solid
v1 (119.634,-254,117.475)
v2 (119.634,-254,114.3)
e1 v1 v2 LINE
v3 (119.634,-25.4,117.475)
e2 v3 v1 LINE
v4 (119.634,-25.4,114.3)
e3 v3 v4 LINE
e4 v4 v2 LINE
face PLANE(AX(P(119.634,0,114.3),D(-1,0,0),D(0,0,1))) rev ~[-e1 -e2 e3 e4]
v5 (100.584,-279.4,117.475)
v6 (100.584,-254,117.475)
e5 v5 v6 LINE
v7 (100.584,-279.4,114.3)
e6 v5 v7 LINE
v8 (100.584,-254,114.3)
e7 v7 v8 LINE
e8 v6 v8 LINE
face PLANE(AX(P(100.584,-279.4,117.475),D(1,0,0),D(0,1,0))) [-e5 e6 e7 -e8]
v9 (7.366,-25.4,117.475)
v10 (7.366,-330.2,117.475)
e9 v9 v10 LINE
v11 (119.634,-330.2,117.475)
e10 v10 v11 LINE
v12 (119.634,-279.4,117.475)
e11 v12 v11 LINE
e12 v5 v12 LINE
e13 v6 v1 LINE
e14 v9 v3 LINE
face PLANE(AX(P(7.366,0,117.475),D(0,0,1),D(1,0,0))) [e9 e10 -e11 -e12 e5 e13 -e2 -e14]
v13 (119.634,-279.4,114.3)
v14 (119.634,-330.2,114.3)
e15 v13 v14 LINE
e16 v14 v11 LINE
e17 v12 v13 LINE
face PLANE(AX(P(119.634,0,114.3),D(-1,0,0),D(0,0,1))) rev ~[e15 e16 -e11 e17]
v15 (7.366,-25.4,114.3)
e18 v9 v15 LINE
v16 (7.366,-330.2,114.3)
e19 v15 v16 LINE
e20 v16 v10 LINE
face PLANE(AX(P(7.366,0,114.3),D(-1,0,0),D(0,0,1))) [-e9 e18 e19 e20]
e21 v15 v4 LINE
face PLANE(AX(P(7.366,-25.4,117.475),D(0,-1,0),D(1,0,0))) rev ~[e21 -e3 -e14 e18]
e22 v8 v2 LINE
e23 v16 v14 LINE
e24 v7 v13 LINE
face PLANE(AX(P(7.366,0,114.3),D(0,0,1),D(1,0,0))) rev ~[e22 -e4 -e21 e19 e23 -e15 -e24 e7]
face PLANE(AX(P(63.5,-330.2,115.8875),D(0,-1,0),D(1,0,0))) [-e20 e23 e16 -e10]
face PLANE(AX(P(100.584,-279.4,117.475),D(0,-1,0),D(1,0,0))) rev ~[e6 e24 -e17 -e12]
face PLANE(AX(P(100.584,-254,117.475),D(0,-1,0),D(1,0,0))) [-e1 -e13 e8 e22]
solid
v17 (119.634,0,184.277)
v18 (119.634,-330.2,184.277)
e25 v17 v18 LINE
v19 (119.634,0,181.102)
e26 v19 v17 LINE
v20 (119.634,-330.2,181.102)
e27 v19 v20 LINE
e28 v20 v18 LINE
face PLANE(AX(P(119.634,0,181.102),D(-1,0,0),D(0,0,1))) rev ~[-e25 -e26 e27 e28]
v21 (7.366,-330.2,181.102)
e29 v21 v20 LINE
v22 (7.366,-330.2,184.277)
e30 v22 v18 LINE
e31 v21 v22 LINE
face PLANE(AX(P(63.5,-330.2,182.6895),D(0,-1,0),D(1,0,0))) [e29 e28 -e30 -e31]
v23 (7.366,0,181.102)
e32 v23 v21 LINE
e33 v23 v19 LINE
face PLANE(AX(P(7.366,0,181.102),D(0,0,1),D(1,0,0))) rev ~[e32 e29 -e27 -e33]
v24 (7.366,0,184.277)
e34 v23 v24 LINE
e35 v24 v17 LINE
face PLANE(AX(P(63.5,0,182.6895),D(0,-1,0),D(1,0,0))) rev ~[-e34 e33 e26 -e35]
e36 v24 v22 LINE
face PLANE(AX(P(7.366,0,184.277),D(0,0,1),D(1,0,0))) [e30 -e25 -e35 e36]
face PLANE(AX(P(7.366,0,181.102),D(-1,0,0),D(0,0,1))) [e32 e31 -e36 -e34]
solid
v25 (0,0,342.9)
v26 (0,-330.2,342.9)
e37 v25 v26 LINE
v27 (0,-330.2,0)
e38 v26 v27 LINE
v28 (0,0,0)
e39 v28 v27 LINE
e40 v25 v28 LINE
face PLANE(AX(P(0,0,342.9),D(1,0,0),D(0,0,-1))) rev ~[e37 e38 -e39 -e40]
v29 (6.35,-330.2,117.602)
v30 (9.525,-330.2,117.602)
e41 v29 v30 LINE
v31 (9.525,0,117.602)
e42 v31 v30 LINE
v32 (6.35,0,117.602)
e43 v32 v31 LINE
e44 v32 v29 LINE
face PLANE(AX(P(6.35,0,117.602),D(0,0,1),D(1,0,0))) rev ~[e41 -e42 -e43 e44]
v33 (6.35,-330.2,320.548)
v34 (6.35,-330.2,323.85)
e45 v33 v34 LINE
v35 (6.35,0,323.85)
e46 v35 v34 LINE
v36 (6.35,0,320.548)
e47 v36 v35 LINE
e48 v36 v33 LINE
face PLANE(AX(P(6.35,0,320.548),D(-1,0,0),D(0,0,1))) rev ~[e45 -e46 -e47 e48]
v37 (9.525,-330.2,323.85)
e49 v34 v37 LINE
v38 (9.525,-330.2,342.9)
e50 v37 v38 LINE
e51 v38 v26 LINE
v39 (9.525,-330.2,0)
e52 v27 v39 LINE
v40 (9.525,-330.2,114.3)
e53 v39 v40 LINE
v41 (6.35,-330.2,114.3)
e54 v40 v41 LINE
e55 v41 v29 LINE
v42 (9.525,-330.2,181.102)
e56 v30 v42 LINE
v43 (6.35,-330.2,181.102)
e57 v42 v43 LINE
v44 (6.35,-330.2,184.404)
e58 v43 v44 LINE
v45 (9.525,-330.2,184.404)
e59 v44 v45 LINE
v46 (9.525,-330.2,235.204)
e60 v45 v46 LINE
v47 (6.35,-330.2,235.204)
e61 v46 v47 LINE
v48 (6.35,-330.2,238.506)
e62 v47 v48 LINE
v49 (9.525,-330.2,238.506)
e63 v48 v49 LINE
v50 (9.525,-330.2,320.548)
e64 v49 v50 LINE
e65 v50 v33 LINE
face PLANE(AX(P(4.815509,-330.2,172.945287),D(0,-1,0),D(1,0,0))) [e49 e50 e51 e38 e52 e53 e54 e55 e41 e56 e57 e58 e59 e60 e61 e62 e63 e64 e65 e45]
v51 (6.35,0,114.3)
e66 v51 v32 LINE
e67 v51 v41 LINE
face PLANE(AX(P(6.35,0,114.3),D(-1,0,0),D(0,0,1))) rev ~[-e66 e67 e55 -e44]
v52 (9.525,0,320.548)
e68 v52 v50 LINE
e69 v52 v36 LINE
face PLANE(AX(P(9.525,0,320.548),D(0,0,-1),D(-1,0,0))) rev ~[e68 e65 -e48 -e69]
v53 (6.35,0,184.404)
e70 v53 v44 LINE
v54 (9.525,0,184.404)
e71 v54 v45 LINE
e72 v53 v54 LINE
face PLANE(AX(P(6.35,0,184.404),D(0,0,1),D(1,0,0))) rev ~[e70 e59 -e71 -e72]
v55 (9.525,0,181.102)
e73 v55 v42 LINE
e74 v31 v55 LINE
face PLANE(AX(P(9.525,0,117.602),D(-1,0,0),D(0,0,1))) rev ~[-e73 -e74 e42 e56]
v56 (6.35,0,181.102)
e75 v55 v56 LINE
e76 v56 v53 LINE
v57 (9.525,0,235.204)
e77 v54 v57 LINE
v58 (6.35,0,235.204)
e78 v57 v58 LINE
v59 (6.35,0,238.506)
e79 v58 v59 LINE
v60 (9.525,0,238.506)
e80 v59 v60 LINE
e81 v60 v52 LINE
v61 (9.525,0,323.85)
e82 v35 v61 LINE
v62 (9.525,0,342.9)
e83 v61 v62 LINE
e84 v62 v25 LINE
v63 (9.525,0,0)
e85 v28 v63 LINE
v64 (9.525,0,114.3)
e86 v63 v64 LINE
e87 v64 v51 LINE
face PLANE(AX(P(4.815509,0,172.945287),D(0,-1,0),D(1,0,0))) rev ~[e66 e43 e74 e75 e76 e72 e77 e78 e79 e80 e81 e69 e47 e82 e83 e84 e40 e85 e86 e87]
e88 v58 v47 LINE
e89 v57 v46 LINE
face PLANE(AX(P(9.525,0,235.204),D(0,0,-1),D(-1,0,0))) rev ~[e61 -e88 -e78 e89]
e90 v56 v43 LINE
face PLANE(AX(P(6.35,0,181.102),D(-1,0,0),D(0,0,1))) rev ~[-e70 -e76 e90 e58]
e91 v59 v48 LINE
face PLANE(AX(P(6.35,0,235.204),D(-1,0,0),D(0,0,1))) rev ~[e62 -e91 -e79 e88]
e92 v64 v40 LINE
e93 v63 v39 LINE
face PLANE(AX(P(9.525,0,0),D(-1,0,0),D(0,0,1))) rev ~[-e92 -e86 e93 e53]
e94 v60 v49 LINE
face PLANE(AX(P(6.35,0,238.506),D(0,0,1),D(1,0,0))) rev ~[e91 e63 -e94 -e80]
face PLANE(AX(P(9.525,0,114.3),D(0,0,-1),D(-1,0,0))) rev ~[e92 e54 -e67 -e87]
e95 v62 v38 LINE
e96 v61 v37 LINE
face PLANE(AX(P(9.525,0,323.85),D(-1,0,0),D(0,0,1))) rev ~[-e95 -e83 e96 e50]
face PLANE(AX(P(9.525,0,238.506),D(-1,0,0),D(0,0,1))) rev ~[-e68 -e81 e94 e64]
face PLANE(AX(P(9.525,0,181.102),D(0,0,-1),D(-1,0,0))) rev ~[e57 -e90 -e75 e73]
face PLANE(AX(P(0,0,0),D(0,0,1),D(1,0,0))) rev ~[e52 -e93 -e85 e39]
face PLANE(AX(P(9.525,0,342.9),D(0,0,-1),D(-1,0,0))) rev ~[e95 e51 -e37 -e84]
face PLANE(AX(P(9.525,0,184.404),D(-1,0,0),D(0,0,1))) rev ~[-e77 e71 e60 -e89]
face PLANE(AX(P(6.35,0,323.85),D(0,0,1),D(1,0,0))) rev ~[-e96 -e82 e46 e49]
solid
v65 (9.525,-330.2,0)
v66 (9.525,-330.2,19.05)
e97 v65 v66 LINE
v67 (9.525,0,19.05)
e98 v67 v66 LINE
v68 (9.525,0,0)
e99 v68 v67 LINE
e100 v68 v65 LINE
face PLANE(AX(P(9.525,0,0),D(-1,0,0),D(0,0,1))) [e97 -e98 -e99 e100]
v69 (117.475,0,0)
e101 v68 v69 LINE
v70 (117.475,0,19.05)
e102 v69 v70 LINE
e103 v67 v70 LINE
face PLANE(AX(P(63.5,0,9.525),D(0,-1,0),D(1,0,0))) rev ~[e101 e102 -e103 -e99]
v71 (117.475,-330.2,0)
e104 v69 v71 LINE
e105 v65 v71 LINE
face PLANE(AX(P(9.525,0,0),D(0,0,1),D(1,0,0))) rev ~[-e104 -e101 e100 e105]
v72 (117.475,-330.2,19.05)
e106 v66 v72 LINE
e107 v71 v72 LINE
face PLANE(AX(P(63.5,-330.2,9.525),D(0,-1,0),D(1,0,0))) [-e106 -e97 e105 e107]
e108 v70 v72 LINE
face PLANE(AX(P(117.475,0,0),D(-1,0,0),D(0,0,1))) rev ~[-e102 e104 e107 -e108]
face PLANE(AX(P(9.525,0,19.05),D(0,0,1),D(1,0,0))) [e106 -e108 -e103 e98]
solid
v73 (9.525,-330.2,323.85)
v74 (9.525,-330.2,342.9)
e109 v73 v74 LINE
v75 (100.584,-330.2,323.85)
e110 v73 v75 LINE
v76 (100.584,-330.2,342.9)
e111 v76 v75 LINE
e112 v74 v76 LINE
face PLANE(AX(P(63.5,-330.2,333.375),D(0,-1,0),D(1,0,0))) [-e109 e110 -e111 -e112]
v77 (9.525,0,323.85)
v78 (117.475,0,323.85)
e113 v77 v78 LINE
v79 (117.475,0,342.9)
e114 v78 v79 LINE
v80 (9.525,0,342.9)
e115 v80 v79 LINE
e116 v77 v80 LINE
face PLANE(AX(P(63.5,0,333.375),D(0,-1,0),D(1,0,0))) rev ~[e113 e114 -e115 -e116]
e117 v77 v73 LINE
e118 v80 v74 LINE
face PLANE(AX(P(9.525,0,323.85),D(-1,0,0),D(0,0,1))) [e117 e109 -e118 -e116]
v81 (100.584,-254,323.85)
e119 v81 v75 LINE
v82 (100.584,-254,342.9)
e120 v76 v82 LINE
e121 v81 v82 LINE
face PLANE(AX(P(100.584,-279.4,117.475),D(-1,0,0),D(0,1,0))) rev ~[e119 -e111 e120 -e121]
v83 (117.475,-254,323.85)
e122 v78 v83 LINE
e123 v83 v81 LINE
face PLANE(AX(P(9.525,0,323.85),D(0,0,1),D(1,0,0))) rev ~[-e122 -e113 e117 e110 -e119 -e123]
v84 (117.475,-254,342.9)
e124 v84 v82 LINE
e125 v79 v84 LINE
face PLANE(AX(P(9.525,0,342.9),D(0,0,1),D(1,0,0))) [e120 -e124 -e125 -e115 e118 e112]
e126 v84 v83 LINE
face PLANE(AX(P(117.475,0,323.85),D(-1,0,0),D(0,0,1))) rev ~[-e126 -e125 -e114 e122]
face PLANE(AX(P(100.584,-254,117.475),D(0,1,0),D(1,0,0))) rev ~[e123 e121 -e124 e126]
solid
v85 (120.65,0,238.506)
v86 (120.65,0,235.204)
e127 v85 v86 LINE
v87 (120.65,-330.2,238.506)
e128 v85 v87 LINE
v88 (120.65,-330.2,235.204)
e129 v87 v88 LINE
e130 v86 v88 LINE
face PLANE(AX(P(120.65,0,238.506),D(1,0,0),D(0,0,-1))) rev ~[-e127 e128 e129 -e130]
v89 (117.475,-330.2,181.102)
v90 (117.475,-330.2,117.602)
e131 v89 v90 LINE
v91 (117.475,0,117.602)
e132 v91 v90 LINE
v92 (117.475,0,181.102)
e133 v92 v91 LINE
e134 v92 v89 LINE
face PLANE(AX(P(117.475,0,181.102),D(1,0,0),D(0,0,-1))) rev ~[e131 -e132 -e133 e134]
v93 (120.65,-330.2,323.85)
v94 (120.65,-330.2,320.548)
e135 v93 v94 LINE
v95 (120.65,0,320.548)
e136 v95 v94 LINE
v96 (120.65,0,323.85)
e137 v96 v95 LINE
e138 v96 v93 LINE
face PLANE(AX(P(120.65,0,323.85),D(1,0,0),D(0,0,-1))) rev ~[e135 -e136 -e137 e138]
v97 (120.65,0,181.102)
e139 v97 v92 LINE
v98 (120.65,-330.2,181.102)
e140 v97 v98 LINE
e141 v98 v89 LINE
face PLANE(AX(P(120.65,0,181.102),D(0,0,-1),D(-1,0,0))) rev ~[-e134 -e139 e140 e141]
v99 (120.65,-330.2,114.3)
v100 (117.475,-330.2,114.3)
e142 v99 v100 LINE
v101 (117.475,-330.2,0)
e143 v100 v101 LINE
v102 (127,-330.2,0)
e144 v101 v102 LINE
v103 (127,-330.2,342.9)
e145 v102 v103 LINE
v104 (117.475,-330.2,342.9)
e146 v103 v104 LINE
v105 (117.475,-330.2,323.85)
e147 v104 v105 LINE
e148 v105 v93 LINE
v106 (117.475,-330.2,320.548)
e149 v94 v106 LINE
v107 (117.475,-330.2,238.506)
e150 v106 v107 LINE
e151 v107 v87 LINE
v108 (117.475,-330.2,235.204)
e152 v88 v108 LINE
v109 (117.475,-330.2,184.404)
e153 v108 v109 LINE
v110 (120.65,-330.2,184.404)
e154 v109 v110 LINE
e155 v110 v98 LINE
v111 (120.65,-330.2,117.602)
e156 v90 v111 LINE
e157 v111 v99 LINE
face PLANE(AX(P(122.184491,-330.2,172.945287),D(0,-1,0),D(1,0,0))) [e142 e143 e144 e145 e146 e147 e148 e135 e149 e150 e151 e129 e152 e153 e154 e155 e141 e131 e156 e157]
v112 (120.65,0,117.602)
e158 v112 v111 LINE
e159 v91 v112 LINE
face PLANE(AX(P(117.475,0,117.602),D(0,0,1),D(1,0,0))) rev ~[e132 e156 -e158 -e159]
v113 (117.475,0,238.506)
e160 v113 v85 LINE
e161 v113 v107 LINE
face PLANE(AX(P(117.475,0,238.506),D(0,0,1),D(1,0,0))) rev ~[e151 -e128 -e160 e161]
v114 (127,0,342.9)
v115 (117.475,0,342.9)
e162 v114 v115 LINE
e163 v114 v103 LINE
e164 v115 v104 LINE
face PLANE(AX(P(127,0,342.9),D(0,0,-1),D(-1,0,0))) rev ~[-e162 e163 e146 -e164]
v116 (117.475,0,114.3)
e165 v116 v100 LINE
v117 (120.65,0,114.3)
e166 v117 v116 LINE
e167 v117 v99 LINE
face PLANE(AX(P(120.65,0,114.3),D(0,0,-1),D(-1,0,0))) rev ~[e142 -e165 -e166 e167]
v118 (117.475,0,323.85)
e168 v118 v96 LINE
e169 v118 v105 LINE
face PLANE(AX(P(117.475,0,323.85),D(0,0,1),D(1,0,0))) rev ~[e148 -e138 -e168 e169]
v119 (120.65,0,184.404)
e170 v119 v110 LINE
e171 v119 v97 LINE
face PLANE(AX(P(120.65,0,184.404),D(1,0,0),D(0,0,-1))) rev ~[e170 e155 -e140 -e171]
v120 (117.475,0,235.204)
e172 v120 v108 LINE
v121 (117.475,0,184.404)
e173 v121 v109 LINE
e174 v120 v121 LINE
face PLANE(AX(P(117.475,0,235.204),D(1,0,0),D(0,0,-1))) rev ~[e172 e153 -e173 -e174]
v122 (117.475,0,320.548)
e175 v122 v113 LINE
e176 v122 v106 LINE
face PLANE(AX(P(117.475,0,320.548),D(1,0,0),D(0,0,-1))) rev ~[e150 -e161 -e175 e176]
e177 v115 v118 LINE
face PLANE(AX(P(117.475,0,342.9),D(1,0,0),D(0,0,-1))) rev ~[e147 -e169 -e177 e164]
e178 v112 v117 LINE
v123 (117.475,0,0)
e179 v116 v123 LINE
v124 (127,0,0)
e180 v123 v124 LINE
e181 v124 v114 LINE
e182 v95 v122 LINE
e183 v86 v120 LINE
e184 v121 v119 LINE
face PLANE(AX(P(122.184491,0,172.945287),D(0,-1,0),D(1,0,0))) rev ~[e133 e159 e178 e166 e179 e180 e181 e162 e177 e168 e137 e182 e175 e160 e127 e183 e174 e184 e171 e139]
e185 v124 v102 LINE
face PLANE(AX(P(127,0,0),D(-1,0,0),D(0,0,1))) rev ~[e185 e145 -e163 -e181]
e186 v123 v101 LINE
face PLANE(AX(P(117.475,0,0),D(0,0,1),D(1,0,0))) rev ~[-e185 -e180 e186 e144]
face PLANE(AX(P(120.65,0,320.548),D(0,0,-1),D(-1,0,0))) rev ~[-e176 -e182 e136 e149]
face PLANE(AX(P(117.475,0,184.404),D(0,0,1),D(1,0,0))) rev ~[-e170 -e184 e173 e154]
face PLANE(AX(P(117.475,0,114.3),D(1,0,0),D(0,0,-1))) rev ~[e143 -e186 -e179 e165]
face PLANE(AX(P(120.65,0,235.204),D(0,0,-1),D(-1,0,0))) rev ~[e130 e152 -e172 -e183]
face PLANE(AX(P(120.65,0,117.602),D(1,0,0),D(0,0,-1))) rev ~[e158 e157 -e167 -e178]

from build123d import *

# Parameters (mm, degrees)
F1_DEPTH  = 330.2
F0_W      = 107.95
F0_H      = 19.05
F2_DEPTH  = 330.2
F3_W      = 112.268
F3_H      = 3.175
F4_DEPTH  = 330.2
F5_W      = 19.05
F5_H      = 25.4
F6_DEPTH  = 3.175
F7_DEPTH  = 225.426
F8_W      = 16.891
F8_H      = 50.8000000001
F9_DEPTH  = 342.901
F10_W     = 112.268
F10_H     = 25.4
F11_DEPTH = 117.476


with BuildPart() as f1:
    # F0 (on Front) → F1 (new body)
    with BuildSketch(Plane.XZ):
        Polygon((0, 342.9), (0, 0), (9.525, 0), (9.525, 19.05), (9.525, 114.3), (6.35, 114.3), (6.35, 117.602), (9.525, 117.602), (9.525, 181.102), (6.35, 181.102), (6.35, 184.404), (9.525, 184.404), (9.525, 235.204), (6.35, 235.204), (6.35, 238.506), (9.525, 238.506), (9.525, 320.548), (6.35, 320.548), (6.35, 323.85), (9.525, 323.85), (9.525, 342.9), align=None)
    extrude(amount=F1_DEPTH)


with BuildPart() as f1b:
    # F0 (on Front) → F1, piece 2 (new body)
    with BuildSketch(Plane.XZ):
        Polygon((117.475, 19.05), (117.475, 0), (127, 0), (127, 342.9), (117.475, 342.9), (117.475, 323.85), (120.65, 323.85), (120.65, 320.548), (117.475, 320.548), (117.475, 238.506), (120.65, 238.506), (120.65, 235.204), (117.475, 235.204), (117.475, 184.404), (120.65, 184.404), (120.65, 181.102), (117.475, 181.102), (117.475, 117.602), (120.65, 117.602), (120.65, 114.3), (117.475, 114.3), align=None)
    extrude(amount=F1_DEPTH)


with BuildPart() as f2:
    # F0 (on Front) → F2 (new body, through all)
    with BuildSketch(Plane.XZ):
        with Locations((63.5, 9.525)):
            Rectangle(F0_W, F0_H)
    extrude(amount=F2_DEPTH)


with BuildPart() as f2b:
    # F0 (on Front) → F2, piece 2 (new body, through all)
    with BuildSketch(Plane.XZ):
        with Locations((63.5, 333.375)):
            Rectangle(F0_W, F0_H)
    extrude(amount=F2_DEPTH)

    # F5 (on face) → F7 (cut, through all)
    with BuildSketch(Plane.XY.offset(117.475)):
        with Locations((110.109, -266.7)):
            Rectangle(F5_W, F5_H)
    extrude(amount=F7_DEPTH, mode=Mode.SUBTRACT)

    # F8 (on face) → F9 (cut, through all)
    with BuildSketch(Plane.XY.offset(342.9)):
        with Locations((109.0295, -304.8000000001)):
            Rectangle(F8_W, F8_H)
    extrude(amount=-F9_DEPTH, mode=Mode.SUBTRACT)


with BuildPart() as f4:
    # F3 (on Front) → F4 (new body, through all)
    with BuildSketch(Plane.XZ):
        with Locations((63.5, 115.8875)):
            Rectangle(F3_W, F3_H)
    extrude(amount=F4_DEPTH)

    # F5 (on face) → F6 (cut, through all)
    with BuildSketch(Plane.XY.offset(117.475)):
        with Locations((110.109, -266.7)):
            Rectangle(F5_W, F5_H)
    extrude(amount=-F6_DEPTH, mode=Mode.SUBTRACT)

    # F10 (on face) → F11 (cut, through all)
    with BuildSketch(Plane.XY.offset(117.475)):
        with Locations((63.5, -12.7)):
            Rectangle(F10_W, F10_H)
    extrude(amount=-F11_DEPTH, mode=Mode.SUBTRACT)


with BuildPart() as f4b:
    # F3 (on Front) → F4, piece 2 (new body, through all)
    with BuildSketch(Plane.XZ):
        with Locations((63.5, 182.6895)):
            Rectangle(F3_W, F3_H)
    extrude(amount=F4_DEPTH)


solid = Compound([f1.part, f1b.part, f2.part, f2b.part, f4.part, f4b.part])
